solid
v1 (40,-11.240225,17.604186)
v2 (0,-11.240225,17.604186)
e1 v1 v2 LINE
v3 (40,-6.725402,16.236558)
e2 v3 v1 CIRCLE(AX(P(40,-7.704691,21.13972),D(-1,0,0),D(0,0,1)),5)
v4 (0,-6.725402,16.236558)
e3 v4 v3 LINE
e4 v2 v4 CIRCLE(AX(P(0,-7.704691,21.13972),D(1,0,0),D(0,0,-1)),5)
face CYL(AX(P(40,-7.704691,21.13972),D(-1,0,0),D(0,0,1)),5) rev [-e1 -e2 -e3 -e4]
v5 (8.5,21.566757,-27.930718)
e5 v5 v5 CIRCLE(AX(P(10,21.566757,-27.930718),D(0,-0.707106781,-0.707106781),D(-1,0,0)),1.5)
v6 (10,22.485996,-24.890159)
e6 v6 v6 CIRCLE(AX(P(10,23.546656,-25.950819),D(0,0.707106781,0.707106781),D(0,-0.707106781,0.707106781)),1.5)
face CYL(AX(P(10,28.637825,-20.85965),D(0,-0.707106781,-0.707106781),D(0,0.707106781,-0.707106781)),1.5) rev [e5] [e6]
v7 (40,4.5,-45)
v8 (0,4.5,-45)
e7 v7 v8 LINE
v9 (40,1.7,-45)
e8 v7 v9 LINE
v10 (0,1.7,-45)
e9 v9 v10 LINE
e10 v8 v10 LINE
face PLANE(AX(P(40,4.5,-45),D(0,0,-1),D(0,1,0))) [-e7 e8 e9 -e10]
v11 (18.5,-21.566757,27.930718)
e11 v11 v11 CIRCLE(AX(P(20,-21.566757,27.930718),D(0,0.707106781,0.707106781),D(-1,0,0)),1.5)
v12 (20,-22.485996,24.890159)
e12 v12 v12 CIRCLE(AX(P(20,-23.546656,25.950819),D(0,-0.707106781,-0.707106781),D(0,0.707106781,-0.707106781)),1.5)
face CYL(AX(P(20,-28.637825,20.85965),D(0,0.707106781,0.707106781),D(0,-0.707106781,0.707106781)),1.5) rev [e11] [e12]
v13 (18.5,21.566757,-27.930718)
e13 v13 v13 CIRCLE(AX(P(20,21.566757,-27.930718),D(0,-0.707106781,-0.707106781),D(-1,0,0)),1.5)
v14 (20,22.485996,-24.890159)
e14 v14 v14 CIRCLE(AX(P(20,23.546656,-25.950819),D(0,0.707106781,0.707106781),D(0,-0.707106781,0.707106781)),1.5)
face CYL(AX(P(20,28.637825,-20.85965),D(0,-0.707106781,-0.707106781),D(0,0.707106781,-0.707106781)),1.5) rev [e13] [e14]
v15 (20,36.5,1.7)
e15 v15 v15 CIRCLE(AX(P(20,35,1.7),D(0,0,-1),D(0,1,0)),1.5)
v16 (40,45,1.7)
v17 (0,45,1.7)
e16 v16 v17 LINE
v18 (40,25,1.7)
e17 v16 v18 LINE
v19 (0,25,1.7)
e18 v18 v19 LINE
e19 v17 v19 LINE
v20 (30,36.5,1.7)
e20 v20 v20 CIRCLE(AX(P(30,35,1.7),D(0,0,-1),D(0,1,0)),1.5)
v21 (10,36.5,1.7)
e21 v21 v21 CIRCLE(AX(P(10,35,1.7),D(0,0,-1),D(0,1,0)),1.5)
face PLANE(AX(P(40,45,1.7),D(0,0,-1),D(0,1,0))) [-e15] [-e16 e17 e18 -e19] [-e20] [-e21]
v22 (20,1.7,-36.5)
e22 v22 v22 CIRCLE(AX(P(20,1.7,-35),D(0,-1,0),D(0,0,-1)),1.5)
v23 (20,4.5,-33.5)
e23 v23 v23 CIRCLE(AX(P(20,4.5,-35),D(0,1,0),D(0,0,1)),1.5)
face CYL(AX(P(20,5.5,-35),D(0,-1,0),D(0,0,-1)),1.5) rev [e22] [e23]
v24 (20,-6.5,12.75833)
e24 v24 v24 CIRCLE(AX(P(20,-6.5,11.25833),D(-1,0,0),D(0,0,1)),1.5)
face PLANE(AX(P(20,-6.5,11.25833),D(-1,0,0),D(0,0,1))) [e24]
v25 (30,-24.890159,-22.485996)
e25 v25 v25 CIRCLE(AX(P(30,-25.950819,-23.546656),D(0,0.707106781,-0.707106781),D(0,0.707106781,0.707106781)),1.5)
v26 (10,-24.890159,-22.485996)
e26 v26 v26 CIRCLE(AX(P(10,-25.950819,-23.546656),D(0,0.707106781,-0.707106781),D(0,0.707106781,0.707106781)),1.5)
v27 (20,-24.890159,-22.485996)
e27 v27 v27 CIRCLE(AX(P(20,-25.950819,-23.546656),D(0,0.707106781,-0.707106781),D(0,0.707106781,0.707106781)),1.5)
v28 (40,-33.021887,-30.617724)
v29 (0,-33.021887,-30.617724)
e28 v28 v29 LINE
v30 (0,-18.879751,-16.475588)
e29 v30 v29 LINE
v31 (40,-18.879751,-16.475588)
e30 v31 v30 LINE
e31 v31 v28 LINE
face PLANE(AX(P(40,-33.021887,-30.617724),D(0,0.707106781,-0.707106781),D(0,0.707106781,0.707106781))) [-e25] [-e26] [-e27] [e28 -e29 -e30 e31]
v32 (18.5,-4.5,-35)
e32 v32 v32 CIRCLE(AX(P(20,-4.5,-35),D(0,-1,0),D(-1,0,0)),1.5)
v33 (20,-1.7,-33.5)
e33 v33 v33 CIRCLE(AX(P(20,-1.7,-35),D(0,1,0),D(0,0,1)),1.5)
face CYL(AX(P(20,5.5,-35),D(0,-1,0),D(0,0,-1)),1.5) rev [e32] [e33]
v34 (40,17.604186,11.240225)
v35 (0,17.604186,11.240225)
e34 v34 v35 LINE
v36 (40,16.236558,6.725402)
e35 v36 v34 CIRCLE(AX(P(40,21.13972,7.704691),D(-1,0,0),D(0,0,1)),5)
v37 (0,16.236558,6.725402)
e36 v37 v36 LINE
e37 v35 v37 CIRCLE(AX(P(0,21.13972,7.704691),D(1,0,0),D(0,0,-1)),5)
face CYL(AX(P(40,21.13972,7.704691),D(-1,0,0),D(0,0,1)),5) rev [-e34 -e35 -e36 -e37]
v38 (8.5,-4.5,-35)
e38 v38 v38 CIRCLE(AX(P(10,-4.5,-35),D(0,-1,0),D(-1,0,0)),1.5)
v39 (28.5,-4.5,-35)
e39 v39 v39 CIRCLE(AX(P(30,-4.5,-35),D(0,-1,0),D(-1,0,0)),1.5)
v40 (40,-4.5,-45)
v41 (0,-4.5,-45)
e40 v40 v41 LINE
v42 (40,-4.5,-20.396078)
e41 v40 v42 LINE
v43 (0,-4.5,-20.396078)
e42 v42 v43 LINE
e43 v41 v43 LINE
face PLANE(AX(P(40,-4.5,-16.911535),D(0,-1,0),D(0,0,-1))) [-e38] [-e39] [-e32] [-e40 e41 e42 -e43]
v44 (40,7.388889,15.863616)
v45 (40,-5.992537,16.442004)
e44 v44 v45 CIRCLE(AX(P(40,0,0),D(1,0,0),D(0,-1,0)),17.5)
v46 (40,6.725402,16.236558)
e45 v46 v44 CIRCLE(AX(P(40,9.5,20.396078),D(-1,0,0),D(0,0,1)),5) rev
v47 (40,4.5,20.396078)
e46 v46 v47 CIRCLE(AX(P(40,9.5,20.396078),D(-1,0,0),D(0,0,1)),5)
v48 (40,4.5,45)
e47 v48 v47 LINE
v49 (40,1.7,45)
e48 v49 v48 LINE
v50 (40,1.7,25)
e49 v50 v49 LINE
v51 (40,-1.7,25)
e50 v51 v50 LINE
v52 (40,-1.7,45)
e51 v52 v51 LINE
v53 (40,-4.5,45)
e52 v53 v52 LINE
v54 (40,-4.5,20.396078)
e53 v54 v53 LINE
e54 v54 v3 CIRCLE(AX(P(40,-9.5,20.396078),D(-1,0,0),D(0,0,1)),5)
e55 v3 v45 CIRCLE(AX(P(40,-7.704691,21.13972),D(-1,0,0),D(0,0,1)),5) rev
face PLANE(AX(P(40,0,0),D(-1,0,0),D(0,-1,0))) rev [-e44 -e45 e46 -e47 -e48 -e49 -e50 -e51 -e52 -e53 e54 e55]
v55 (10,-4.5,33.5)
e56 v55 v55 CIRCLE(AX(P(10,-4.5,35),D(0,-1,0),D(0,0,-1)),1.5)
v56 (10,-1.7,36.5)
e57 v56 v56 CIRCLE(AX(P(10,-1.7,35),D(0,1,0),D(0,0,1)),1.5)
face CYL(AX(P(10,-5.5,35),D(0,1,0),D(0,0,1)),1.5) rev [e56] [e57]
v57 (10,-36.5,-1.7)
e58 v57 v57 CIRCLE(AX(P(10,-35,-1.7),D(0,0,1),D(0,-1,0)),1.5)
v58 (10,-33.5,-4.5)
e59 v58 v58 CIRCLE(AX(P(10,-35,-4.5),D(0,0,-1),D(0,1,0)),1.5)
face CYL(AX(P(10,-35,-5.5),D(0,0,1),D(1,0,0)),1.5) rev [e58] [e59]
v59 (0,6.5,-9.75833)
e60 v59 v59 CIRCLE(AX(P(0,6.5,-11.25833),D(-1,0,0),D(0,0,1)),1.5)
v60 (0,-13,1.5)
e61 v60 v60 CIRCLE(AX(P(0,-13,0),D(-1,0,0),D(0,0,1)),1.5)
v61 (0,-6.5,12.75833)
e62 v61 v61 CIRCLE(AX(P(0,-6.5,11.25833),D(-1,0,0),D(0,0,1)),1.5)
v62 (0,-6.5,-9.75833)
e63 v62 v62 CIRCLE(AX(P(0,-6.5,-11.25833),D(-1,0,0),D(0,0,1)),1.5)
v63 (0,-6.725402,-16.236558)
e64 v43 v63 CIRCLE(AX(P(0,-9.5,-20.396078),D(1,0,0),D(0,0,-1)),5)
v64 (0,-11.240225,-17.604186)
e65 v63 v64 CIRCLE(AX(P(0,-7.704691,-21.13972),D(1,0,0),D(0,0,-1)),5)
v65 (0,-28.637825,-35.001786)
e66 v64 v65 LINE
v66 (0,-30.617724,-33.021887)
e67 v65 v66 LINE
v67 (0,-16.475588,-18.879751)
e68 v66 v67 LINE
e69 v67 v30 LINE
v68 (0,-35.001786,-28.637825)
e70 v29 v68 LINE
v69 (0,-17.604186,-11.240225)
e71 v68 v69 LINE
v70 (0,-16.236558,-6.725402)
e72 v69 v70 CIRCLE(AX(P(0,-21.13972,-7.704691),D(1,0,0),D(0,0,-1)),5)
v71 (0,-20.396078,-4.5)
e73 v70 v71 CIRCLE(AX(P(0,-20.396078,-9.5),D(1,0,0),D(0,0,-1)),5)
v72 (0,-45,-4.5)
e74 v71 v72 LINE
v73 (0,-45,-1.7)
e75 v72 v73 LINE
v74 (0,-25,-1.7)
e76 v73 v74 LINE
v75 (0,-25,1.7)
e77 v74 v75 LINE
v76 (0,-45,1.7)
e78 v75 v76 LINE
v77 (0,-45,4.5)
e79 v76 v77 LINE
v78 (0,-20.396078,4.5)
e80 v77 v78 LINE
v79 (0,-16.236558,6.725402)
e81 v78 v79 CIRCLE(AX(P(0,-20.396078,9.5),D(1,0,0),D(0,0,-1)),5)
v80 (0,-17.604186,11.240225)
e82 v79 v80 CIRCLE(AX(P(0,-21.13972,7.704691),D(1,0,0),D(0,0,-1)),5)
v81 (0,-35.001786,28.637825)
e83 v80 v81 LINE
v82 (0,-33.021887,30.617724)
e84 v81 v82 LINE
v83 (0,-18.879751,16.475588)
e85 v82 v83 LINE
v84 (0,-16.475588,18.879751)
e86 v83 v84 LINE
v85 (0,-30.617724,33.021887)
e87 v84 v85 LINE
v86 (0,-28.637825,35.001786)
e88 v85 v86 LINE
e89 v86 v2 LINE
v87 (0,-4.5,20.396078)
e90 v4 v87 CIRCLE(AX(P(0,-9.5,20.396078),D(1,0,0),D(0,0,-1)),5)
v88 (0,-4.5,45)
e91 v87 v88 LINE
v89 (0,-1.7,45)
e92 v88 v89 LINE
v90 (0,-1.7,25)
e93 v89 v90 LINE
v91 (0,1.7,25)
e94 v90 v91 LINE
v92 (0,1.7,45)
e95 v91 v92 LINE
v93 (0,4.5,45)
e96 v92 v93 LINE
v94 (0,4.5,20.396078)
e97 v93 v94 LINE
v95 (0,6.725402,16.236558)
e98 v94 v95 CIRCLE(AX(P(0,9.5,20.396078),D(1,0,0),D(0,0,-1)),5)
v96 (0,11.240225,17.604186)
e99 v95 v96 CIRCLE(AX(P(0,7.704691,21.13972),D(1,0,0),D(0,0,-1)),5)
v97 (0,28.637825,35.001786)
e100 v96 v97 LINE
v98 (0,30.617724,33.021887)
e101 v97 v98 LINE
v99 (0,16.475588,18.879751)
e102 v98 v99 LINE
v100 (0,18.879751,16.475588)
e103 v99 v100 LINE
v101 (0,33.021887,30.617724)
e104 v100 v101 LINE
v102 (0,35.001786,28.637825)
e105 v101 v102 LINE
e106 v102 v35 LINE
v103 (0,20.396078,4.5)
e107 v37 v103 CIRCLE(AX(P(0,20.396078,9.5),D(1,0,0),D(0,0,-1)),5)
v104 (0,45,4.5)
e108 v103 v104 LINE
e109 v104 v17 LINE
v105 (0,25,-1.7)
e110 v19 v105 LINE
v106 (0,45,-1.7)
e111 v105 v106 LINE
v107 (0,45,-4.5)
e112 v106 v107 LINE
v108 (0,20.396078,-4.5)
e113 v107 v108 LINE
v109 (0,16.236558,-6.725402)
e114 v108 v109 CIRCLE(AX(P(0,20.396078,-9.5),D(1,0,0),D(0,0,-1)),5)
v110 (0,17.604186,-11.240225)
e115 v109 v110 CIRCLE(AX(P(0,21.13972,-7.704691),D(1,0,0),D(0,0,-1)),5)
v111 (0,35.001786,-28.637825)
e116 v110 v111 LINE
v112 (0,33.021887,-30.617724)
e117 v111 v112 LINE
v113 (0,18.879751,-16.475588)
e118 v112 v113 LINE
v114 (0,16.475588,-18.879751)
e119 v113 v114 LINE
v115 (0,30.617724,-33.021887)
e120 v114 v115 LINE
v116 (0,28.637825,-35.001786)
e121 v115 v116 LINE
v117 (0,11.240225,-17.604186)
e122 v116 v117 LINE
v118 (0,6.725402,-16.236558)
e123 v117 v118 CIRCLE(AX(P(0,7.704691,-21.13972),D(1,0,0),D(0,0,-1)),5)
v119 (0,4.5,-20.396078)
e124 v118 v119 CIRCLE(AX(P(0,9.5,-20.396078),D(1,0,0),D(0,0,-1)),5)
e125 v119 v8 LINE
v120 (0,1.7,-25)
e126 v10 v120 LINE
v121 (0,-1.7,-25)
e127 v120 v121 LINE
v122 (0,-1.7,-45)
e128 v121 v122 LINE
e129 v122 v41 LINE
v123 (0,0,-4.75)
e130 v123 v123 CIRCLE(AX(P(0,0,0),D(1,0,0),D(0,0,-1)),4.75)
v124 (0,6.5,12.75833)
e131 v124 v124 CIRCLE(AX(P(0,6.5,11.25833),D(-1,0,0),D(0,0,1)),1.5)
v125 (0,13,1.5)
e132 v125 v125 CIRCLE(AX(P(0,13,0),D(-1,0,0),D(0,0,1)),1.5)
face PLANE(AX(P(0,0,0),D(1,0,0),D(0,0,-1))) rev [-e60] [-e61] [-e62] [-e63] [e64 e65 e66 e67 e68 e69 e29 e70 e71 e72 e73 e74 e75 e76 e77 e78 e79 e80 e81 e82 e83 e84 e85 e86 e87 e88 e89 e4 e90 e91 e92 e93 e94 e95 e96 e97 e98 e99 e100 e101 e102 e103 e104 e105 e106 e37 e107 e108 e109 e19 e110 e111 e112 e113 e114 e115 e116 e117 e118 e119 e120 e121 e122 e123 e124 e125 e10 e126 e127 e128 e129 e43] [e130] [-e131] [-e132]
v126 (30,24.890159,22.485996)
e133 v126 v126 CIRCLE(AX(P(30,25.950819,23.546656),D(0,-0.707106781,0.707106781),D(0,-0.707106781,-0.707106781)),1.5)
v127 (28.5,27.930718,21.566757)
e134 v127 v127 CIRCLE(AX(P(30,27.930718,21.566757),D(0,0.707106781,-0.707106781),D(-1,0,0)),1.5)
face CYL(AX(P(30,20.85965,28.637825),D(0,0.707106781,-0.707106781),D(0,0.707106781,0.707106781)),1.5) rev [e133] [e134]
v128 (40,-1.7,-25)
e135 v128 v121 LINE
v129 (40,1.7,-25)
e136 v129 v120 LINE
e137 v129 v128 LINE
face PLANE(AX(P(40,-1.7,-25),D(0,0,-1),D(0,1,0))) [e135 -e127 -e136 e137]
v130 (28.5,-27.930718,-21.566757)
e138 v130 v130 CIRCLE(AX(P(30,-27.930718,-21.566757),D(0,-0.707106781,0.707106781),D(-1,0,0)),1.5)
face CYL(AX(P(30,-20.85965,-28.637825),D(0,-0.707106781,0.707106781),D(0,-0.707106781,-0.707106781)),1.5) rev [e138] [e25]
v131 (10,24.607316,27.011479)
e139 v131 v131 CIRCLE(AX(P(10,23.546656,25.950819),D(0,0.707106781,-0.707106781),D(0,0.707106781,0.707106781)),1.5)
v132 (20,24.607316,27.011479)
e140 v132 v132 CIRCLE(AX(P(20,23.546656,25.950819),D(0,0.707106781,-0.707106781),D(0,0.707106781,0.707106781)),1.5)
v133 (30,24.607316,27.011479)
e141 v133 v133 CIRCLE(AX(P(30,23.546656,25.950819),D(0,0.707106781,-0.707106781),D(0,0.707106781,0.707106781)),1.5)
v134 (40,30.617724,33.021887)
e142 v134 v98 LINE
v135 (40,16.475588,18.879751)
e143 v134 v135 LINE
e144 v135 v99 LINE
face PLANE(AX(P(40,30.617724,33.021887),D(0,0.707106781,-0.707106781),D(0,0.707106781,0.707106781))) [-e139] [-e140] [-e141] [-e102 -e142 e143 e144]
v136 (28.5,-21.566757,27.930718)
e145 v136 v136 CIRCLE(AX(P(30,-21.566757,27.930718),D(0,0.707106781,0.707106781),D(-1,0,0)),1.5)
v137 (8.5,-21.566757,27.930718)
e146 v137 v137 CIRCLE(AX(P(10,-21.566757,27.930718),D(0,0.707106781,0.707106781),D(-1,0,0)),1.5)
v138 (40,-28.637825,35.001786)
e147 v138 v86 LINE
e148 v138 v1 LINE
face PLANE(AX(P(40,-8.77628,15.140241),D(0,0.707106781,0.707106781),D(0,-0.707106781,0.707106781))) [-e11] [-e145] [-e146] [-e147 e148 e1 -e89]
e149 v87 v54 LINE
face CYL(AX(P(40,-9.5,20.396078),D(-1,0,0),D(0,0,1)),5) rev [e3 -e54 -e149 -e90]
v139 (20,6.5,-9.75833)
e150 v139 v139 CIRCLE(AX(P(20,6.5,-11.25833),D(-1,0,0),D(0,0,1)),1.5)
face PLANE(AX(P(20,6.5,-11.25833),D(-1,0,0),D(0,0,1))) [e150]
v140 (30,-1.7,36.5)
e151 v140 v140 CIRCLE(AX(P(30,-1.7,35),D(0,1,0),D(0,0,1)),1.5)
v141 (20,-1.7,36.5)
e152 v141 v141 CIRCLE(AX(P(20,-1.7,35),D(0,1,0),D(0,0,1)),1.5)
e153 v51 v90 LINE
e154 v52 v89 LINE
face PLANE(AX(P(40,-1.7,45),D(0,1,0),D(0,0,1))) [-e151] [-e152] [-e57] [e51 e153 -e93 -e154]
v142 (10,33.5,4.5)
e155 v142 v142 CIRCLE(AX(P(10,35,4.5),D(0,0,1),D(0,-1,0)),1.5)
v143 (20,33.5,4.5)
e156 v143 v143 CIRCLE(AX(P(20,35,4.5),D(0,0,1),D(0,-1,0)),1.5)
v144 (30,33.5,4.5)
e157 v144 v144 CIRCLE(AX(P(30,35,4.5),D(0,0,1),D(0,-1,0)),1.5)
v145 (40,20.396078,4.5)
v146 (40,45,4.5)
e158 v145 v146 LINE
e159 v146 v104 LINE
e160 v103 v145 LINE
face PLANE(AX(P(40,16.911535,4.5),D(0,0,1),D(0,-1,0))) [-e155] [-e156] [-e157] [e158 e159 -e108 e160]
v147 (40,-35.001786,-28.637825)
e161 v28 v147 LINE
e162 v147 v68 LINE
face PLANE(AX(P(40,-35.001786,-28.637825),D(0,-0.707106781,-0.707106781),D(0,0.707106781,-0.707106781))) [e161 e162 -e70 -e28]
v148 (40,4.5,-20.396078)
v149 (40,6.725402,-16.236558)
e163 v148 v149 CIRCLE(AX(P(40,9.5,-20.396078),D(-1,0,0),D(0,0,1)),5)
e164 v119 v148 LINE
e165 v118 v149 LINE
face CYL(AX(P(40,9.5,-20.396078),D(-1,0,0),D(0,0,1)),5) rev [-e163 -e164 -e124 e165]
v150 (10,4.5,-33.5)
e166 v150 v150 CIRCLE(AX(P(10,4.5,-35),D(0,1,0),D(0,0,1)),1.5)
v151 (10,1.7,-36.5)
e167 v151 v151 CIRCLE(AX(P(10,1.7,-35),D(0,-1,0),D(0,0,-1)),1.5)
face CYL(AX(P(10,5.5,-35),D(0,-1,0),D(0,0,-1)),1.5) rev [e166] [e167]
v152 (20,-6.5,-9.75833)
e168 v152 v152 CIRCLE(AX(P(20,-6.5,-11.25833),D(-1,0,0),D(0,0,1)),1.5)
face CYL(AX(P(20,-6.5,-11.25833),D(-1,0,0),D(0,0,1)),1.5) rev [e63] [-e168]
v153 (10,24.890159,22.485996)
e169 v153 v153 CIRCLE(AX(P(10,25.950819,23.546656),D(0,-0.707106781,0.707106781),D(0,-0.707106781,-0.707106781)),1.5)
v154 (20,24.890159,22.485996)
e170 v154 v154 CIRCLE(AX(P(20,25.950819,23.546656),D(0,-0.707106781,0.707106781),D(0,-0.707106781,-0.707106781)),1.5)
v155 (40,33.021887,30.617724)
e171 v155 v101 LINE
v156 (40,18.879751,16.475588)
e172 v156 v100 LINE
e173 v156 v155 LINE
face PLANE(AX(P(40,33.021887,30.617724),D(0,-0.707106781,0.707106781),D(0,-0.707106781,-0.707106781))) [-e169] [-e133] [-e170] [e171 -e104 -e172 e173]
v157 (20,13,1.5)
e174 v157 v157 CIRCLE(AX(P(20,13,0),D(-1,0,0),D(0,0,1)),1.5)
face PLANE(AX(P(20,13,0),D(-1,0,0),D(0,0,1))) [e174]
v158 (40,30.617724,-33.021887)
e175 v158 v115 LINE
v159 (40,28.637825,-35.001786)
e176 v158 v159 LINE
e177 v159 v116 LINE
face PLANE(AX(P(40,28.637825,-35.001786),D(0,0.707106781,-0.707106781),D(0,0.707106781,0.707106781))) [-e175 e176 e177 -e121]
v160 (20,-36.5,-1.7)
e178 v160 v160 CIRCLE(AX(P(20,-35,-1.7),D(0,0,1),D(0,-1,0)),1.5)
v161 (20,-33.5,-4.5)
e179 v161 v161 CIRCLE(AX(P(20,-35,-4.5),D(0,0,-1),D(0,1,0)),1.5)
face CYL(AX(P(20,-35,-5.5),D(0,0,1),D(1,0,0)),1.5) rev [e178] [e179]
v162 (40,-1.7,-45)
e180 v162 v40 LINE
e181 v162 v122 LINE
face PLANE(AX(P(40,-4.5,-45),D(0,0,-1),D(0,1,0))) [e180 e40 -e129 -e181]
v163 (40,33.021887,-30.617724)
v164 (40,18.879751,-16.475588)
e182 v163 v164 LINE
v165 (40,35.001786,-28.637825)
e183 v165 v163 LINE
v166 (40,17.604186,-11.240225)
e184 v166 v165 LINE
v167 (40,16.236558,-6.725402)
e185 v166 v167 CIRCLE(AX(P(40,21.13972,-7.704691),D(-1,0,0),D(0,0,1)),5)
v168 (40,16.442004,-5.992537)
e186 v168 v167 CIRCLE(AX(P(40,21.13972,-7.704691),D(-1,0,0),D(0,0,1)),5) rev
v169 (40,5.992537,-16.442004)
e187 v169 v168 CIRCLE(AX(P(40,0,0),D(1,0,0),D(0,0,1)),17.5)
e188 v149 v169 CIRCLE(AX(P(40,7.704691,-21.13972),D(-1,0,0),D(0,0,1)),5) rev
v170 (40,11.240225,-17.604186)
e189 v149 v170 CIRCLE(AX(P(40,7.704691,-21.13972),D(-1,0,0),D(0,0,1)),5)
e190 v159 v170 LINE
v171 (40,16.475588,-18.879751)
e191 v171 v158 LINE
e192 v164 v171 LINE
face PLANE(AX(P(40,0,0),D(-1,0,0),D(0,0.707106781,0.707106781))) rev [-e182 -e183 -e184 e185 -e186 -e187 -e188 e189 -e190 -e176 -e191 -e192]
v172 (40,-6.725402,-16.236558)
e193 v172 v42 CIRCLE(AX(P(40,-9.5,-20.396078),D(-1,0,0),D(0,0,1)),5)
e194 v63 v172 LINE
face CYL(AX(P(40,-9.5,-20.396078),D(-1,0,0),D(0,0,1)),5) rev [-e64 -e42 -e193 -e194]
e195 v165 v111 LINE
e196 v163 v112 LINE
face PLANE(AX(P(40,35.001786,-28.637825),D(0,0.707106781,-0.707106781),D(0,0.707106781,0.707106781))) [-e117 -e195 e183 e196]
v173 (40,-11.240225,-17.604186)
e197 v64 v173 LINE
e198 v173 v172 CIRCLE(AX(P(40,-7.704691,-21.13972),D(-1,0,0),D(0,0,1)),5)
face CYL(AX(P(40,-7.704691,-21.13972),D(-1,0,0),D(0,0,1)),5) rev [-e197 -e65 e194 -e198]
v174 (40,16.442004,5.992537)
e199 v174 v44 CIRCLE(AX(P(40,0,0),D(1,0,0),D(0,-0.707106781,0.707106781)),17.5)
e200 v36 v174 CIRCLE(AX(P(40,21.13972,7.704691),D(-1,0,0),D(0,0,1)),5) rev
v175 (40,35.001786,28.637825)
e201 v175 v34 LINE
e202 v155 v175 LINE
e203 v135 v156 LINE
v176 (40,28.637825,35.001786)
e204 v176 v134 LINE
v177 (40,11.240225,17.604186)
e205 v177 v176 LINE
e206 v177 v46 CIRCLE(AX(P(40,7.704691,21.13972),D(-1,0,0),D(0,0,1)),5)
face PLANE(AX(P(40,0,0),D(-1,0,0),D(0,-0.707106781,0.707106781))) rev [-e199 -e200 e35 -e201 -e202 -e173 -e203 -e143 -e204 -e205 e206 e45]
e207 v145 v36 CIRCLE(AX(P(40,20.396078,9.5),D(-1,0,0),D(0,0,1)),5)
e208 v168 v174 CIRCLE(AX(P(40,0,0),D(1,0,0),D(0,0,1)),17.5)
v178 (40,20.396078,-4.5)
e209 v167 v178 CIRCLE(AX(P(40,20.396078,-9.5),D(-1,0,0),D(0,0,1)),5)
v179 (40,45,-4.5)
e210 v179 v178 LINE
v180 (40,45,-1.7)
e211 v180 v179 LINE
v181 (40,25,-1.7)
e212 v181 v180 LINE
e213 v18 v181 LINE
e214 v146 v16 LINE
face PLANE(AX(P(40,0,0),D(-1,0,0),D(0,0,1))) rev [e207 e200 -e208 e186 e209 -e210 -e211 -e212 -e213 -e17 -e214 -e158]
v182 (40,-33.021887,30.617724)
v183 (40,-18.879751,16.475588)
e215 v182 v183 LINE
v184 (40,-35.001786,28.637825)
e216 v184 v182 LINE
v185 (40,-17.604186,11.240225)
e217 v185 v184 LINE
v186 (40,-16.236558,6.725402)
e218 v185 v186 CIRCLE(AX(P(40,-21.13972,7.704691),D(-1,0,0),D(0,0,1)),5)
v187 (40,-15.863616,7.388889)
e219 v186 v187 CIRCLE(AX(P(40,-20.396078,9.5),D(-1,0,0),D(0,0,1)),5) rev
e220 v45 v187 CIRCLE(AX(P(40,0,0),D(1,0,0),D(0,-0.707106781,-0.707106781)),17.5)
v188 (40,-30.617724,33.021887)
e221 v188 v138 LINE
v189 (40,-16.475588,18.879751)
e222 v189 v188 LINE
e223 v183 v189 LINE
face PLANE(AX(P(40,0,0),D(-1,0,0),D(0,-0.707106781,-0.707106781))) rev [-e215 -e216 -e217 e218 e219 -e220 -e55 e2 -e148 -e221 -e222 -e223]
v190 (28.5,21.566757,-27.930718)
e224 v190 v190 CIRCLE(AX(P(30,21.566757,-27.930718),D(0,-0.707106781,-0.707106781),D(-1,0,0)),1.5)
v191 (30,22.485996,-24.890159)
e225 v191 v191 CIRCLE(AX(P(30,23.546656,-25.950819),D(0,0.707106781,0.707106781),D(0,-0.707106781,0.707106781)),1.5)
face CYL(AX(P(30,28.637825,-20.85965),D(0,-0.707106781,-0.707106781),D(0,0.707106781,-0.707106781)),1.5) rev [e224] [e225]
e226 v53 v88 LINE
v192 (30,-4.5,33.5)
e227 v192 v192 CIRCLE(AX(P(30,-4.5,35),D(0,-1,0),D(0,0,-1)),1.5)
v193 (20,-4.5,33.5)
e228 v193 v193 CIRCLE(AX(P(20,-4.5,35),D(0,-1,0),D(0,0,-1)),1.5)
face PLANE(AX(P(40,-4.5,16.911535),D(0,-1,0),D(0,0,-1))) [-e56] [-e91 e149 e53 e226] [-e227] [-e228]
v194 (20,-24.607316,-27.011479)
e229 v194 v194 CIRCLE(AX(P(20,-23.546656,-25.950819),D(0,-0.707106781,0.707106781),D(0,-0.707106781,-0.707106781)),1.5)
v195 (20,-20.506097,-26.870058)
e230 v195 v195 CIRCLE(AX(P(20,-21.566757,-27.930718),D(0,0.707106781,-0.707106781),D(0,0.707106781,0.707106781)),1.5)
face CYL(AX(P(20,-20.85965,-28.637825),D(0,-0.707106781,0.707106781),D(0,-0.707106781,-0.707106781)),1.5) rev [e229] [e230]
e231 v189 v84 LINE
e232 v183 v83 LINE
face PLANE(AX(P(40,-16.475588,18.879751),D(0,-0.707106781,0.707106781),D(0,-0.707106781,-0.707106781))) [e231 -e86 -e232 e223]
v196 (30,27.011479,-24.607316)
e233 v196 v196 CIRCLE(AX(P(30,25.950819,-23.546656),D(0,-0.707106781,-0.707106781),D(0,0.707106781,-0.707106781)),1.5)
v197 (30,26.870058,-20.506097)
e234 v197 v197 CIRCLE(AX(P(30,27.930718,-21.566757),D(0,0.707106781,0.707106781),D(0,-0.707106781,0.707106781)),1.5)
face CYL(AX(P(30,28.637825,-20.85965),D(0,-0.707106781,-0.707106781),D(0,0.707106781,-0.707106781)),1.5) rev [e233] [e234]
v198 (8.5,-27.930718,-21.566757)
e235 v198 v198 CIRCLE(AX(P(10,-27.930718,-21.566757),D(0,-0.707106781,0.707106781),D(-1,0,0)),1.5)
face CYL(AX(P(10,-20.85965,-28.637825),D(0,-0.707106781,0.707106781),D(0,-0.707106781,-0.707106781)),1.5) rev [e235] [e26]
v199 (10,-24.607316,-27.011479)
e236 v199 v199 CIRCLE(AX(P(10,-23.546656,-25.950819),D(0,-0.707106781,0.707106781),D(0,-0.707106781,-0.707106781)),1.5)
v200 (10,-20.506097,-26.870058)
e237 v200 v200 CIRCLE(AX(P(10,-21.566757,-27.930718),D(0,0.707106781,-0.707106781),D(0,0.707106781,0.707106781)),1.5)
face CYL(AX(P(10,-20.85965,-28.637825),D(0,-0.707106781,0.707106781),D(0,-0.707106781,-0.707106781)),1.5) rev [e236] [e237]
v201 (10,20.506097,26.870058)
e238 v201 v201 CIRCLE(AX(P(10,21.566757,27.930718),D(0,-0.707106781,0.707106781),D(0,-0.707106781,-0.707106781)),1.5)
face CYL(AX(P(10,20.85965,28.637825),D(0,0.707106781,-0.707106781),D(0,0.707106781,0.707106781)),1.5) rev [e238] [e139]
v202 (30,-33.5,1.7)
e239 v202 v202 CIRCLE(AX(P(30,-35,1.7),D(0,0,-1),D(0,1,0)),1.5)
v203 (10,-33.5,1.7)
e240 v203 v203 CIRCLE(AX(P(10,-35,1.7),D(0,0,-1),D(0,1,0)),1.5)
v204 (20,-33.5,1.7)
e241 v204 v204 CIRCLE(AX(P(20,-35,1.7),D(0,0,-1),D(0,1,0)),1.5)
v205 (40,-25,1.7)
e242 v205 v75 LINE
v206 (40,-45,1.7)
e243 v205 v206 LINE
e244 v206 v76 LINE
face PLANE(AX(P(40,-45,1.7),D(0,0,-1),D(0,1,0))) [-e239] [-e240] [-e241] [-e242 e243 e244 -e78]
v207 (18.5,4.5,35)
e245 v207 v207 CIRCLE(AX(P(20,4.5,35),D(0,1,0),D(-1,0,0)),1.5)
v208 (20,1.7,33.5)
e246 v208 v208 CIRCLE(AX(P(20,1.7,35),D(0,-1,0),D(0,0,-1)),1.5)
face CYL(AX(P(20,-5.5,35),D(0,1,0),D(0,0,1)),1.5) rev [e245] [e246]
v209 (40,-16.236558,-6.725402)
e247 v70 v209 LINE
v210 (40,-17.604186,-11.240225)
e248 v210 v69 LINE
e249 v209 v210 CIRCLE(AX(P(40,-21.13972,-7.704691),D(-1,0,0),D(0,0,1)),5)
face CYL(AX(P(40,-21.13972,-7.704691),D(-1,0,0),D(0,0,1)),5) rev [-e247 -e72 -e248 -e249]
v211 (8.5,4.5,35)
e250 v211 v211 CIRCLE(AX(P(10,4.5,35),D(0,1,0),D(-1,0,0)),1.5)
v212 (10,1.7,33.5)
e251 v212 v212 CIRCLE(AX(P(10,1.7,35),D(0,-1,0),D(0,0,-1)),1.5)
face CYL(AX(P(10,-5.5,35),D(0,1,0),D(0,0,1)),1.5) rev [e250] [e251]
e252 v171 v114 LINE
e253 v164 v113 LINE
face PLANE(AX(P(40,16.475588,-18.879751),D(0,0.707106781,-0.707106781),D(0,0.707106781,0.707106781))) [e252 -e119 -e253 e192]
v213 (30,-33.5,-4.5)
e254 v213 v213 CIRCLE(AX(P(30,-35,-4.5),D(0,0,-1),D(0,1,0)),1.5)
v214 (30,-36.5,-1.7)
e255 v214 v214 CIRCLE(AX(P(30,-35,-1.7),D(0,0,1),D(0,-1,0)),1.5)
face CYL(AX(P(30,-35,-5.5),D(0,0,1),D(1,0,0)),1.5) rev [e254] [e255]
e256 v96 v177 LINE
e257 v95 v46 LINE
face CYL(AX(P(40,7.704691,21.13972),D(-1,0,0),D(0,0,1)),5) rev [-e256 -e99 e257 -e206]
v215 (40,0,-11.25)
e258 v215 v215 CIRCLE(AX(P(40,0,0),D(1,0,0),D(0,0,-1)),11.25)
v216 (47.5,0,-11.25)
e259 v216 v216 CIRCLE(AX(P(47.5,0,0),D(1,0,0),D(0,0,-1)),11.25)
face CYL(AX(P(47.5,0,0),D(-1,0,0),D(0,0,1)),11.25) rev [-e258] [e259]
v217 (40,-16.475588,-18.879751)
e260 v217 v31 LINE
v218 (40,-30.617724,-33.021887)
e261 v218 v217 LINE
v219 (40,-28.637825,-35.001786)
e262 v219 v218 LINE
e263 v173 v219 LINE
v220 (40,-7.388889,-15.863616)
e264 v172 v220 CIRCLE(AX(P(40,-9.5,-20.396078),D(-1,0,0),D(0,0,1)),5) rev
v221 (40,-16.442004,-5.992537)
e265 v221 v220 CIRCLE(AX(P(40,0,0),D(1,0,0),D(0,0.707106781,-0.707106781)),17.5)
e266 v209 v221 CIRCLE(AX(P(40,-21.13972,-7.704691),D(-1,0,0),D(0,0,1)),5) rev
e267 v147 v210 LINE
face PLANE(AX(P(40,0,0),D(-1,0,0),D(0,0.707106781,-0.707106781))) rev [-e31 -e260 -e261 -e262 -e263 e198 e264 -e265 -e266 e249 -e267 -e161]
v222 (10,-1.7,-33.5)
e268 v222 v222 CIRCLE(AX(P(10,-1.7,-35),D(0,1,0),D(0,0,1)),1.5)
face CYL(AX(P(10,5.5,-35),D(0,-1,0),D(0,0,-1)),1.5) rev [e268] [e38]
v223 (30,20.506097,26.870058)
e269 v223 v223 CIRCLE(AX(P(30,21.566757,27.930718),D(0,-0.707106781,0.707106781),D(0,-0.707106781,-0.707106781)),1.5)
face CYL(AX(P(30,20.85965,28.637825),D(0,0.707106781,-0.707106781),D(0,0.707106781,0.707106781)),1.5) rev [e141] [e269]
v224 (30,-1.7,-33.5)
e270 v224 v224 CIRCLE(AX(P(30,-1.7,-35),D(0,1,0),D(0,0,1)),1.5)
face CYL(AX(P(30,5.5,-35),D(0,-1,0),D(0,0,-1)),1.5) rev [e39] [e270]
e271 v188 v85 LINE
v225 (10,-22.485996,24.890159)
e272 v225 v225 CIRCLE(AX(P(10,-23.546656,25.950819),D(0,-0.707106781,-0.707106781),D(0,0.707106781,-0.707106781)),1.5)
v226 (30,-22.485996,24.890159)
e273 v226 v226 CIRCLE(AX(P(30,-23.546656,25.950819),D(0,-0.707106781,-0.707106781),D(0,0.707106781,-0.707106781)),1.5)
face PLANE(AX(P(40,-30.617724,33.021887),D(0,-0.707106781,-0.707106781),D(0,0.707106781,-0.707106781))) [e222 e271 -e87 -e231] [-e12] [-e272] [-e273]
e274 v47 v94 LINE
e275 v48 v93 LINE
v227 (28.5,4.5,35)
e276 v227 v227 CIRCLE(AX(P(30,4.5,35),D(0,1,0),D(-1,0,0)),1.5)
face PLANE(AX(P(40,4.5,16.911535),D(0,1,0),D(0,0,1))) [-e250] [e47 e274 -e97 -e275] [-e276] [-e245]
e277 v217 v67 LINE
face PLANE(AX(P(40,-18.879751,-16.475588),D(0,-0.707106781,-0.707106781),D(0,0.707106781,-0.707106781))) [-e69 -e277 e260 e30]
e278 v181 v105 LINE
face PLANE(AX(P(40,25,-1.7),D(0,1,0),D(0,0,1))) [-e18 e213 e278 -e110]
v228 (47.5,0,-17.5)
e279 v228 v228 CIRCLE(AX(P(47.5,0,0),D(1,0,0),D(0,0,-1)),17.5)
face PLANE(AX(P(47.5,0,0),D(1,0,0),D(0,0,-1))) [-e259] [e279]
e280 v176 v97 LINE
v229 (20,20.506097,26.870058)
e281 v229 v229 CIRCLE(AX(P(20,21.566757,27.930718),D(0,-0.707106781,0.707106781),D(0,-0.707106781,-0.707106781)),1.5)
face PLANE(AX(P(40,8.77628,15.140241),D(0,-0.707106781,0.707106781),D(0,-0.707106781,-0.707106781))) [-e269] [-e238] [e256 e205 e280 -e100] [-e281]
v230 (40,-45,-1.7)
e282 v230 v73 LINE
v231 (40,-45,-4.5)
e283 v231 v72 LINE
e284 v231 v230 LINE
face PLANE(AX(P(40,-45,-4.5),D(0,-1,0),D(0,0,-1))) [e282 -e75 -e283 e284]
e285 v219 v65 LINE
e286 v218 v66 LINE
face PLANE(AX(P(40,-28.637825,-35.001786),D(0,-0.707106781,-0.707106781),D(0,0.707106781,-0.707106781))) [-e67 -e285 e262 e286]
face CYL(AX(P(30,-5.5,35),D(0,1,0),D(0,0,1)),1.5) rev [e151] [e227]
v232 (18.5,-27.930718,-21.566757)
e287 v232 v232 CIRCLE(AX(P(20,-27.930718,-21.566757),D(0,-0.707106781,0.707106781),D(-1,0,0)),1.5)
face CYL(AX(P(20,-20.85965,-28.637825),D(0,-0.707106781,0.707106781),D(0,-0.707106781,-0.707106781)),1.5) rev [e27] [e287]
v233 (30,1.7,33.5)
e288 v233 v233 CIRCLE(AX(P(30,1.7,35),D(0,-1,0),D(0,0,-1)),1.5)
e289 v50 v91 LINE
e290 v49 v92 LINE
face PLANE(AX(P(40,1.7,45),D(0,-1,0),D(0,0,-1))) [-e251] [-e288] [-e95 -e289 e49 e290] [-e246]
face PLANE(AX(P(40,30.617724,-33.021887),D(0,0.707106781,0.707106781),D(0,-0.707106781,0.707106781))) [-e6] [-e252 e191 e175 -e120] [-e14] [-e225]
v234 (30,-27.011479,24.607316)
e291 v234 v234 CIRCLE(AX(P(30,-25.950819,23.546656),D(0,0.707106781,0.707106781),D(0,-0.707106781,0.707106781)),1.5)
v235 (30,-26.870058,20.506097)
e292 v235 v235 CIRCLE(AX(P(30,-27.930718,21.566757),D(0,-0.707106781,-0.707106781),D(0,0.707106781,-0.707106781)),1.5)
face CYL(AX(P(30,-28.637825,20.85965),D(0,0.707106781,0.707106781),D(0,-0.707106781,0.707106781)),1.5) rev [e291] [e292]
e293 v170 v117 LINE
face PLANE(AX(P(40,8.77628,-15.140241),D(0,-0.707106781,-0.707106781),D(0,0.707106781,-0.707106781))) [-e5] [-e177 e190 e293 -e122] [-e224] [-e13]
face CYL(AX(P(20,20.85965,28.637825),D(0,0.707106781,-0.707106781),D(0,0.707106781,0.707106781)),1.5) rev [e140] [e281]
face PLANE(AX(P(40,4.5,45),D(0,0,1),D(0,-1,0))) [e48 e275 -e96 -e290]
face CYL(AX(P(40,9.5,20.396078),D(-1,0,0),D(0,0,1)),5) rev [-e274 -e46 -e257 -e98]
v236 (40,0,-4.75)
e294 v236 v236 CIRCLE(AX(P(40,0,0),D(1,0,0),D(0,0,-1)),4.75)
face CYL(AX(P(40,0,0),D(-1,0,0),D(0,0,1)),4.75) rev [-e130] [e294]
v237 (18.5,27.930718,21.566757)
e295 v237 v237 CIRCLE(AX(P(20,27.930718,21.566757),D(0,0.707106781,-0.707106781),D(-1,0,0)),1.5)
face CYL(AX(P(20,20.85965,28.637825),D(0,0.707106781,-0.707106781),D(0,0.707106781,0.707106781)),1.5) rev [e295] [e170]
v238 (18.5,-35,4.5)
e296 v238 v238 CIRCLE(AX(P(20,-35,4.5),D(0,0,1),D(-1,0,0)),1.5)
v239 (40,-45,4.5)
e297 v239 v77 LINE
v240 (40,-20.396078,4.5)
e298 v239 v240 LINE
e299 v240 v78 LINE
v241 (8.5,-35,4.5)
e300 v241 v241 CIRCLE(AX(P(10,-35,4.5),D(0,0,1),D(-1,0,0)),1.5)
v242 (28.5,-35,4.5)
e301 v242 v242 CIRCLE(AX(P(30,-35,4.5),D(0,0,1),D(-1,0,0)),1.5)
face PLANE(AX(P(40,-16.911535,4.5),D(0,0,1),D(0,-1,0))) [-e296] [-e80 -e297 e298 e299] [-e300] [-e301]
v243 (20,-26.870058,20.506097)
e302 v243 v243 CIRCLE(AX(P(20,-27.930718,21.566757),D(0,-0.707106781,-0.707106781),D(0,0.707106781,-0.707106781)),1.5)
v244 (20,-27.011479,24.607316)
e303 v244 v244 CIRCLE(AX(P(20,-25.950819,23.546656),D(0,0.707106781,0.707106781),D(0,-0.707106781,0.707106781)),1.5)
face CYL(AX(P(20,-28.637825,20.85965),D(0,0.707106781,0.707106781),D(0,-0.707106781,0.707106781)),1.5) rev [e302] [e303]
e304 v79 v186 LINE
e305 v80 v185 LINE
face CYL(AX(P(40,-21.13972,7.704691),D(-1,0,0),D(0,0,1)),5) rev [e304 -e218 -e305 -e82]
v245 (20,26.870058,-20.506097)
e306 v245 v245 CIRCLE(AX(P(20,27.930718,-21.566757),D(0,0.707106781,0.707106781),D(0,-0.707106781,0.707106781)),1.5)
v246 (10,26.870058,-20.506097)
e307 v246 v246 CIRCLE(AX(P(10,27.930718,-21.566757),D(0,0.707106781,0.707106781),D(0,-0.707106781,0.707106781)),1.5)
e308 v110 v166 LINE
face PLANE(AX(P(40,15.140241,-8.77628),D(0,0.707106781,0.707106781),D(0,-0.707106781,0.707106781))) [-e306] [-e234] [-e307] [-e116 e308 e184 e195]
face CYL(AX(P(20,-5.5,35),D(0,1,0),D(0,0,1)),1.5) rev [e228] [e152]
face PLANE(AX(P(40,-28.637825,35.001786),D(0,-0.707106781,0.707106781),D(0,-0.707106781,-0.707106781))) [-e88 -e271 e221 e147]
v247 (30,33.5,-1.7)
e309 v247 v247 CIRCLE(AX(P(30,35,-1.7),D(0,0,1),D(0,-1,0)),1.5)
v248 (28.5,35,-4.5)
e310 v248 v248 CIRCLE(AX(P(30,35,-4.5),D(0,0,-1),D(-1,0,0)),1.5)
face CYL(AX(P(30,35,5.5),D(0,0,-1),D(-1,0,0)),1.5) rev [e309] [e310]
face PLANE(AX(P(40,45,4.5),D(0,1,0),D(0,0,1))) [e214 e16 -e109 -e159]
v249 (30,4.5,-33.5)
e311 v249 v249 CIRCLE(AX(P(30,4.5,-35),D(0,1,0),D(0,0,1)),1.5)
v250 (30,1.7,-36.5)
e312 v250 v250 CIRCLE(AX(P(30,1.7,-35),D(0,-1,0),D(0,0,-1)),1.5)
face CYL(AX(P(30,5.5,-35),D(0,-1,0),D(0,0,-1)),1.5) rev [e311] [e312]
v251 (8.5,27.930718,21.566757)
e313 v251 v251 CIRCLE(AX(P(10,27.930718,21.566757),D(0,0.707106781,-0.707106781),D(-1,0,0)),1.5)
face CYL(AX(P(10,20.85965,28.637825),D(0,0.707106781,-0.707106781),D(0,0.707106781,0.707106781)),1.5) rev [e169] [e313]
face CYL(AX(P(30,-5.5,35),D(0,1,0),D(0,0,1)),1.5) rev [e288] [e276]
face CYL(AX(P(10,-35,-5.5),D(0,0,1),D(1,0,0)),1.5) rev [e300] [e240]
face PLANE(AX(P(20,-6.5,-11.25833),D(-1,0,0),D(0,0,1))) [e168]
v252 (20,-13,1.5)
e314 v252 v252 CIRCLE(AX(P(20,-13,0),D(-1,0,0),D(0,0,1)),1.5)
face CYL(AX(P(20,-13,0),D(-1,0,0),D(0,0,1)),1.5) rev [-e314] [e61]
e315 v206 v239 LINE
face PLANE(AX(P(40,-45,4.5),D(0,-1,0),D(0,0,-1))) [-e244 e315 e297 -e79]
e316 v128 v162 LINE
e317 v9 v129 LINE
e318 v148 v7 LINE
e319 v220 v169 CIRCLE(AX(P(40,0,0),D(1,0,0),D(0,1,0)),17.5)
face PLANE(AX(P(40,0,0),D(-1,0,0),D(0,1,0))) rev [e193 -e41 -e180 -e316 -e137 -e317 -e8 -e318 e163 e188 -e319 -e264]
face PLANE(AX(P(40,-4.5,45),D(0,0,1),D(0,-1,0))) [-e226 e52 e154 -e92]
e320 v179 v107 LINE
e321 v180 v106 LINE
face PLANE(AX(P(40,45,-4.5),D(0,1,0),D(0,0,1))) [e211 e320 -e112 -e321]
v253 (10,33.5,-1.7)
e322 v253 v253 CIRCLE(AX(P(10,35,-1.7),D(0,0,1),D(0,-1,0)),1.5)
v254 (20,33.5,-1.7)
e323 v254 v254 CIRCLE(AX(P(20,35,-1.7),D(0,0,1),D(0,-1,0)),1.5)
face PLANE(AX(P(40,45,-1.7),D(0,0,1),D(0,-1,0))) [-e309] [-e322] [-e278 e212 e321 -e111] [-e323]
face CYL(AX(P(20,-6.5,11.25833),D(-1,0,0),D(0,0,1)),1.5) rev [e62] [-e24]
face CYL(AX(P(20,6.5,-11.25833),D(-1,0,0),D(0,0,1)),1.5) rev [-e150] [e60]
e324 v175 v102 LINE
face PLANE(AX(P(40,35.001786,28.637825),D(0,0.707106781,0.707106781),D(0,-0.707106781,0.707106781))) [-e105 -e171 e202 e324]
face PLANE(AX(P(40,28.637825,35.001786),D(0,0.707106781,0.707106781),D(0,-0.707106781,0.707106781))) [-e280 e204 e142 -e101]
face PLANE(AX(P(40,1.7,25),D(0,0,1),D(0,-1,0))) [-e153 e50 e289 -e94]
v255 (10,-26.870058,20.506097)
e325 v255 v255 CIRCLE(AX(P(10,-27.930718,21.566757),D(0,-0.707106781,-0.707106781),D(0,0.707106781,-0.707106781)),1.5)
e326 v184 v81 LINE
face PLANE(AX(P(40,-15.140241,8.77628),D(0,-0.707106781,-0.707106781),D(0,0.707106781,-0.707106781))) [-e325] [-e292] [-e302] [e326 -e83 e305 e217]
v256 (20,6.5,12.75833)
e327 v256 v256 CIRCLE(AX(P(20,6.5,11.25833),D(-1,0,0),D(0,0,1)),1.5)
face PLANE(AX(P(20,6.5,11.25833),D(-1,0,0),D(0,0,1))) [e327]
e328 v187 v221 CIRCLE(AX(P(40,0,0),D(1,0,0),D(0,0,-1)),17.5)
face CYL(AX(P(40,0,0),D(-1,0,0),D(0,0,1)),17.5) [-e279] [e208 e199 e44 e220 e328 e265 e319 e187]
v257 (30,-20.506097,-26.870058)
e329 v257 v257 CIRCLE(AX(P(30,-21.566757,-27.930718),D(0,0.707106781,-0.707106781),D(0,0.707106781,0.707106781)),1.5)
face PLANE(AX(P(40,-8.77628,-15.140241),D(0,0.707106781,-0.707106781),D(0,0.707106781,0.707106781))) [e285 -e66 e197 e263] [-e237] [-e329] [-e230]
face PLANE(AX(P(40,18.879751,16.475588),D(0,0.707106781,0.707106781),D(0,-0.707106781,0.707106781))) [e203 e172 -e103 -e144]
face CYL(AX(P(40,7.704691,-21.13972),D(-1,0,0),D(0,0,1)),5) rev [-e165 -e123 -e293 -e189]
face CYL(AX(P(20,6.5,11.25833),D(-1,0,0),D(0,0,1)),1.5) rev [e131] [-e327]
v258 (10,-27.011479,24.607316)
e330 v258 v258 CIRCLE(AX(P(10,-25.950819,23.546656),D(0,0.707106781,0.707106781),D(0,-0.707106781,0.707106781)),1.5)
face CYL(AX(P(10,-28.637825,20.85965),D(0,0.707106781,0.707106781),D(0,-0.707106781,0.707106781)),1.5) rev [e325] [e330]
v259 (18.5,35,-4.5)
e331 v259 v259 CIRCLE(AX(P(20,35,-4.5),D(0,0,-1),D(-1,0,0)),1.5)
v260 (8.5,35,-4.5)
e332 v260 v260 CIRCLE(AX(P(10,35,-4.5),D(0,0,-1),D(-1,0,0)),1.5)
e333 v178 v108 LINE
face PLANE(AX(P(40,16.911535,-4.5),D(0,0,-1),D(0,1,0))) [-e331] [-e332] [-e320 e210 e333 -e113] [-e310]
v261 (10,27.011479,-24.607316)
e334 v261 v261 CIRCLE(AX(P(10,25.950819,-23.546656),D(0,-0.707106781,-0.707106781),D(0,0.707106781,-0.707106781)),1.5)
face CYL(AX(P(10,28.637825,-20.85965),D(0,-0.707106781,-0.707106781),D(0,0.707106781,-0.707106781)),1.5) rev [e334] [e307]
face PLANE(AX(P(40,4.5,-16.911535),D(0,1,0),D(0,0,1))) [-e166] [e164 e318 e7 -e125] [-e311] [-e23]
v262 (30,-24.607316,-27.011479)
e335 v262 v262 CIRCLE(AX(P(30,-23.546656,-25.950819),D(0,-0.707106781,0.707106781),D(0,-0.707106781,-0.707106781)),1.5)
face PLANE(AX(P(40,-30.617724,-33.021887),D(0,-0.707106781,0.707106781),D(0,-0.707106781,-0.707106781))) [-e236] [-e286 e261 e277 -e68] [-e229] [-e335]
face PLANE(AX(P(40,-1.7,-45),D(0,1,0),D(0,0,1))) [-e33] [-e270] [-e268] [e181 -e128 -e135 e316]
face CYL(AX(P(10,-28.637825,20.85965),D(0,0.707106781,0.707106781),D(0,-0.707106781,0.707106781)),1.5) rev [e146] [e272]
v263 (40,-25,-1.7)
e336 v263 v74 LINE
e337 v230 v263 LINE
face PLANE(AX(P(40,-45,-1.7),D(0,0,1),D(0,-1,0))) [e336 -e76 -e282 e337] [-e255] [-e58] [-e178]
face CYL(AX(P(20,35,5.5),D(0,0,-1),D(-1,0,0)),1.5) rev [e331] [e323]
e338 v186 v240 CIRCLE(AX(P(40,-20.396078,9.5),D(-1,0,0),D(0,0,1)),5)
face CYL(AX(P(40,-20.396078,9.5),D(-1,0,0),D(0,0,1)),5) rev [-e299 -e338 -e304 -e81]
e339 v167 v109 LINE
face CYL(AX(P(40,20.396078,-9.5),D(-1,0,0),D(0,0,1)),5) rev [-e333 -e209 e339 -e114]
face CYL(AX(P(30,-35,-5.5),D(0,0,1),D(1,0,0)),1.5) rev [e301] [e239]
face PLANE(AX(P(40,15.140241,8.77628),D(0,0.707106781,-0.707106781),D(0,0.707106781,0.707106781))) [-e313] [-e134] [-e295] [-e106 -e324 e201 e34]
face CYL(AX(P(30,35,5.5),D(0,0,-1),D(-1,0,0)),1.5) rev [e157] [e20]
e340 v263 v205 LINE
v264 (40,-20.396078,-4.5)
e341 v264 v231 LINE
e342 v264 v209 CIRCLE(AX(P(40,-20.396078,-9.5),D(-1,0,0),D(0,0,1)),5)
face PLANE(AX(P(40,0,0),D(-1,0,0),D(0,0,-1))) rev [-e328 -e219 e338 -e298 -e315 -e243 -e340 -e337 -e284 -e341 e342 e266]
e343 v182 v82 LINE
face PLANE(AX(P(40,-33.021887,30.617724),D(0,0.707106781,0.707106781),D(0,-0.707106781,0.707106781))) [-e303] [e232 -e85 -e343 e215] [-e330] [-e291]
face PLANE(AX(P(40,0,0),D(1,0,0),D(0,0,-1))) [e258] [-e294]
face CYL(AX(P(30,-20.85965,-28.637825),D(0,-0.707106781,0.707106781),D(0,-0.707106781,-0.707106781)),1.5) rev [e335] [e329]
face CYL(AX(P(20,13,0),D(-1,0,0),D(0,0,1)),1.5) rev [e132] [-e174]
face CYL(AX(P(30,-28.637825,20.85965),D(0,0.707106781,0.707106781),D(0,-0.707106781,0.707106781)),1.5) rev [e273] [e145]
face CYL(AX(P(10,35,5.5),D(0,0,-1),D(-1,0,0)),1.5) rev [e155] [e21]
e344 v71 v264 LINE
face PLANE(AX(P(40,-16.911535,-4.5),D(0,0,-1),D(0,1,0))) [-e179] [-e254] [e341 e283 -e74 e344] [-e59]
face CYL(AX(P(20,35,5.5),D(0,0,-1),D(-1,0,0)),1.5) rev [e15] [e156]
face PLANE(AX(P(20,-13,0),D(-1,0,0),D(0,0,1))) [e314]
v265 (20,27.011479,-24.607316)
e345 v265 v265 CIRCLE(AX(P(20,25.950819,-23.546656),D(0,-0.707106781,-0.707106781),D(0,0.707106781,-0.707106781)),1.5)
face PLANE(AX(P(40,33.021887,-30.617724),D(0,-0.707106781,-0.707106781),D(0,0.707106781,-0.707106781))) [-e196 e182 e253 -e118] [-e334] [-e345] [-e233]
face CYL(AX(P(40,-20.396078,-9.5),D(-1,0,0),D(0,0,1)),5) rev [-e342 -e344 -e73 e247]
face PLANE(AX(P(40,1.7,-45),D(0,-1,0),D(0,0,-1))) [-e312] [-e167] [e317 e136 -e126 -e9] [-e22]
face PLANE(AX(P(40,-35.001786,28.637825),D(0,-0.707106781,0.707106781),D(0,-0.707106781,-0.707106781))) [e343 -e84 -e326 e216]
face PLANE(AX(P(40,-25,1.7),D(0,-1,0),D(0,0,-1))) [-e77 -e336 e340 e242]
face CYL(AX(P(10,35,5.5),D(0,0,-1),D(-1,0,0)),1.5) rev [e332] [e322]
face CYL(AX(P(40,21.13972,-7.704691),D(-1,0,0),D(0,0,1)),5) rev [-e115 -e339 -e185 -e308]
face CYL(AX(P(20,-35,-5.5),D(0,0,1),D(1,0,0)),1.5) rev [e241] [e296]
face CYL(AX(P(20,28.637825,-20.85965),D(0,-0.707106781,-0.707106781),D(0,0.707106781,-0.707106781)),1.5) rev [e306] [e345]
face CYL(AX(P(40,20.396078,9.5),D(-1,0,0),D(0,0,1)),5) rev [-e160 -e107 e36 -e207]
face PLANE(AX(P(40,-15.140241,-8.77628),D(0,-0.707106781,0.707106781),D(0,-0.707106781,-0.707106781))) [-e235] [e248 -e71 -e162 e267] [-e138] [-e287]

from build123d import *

# Parameters (mm, degrees)
SKETCH1_R               = 17.5
SKETCH1_R_2             = 4.75
MAINBODY_DEPTH          = 40
SKETCH2_R               = 17.5
SKETCH2_R_2             = 11.25
BEARINGHOUSING_DEPTH    = 7.5
SKETCH3_R               = 1.5
MOUNTINGHOLES_DEPTH     = 20
BOSS_EXTRUDE3_DEPTH     = 40
SKETCH6_R               = 1.5
CUT_EXTRUDE2_DEPTH      = 10
FILLET1_R               = 5
CIRPATTERN1_DEPTH       = 40
CIRPATTERN1_START       = -5
CIRPATTERN1_2_OUTLINE_R = 1.5
CIRPATTERN1_2_DEPTH     = 10
CIRPATTERN1_3_OUTLINE_R = 1.5
CIRPATTERN1_3_DEPTH     = 10
CIRPATTERN1_4_OUTLINE_R = 1.5
CIRPATTERN1_4_DEPTH     = 10
CIRPATTERN1_5_OUTLINE_R = 1.5
CIRPATTERN1_5_DEPTH     = 10


with BuildPart() as part:
    # Sketch1 → MainBody (new body)
    with BuildSketch(Plane(origin=(0, 0, 0), x_dir=(0, 0, -1), z_dir=(1, 0, 0))):
        Circle(SKETCH1_R)
        Circle(SKETCH1_R_2, mode=Mode.SUBTRACT)
    extrude(amount=MAINBODY_DEPTH)

    # Sketch2 → BearingHousing (add)
    with BuildSketch(Plane(origin=(40, 0, 0), x_dir=(0, 0, -1), z_dir=(1, 0, 0))):
        Circle(SKETCH2_R)
        Circle(SKETCH2_R_2, mode=Mode.SUBTRACT)
    extrude(amount=BEARINGHOUSING_DEPTH)

    # Sketch3 → MountingHoles (cut)
    with BuildSketch(Plane.ZY):
        with Locations((0, 13)):
            Circle(SKETCH3_R)
        with Locations((11.258330249, 6.5)):
            Circle(SKETCH3_R)
        with Locations((11.258330249, -6.5)):
            Circle(SKETCH3_R)
        with Locations((0, -13)):
            Circle(SKETCH3_R)
        with Locations((-11.258330249, -6.5)):
            Circle(SKETCH3_R)
        with Locations((-11.258330249, 6.5)):
            Circle(SKETCH3_R)
    extrude(amount=-MOUNTINGHOLES_DEPTH, mode=Mode.SUBTRACT)

    # Sketch4 → Boss-Extrude3 (add)
    with BuildSketch(Plane.ZY):
        with BuildLine():
            Line((-4.5, 16.911534525), (-4.5, 45))
            Line((-4.5, 45), (-1.7, 45))
            Line((-1.7, 45), (-1.7, 25))
            Line((-1.7, 25), (1.7, 25))
            Line((1.7, 25), (1.7, 45))
            Line((1.7, 45), (4.5, 45))
            Line((4.5, 45), (4.5, 16.911534525))
            ThreePointArc((4.5, 16.911534525), (0, 17.5), (-4.5, 16.911534525))
        make_face()
    extrude(amount=-BOSS_EXTRUDE3_DEPTH)

    # Sketch6 → Cut-Extrude2 (cut)
    with BuildSketch(Plane(origin=(0, 0, -4.5), x_dir=(-1, 0, 0), z_dir=(0, 0, -1))):
        with Locations((-30, 35)):
            Circle(SKETCH6_R)
        with Locations((-20, 35)):
            Circle(SKETCH6_R)
        with Locations((-10, 35)):
            Circle(SKETCH6_R)
    extrude(amount=-CUT_EXTRUDE2_DEPTH, mode=Mode.SUBTRACT)

    # Fillet1
    fillet1_edges = [part.edges().sort_by_distance(p)[0] for p in [
        (20, 16.911534525, 4.5),
        (20, 16.911534525, -4.5),
    ]]
    fillet(fillet1_edges, radius=FILLET1_R)

    # CirPattern1: read off the stored shape, not the designer's step
    # CirPattern1 outline → CirPattern1 (add)
    with BuildSketch(Plane.YZ):
        with BuildLine():
            Line((-45, 4.5), (-45, 1.7))
            Line((-45, 1.7), (-25, 1.7))
            Line((-25, 1.7), (-25, -1.7))
            Line((-25, -1.7), (-45, -1.7))
            Line((-45, -1.7), (-45, -4.5))
            Line((-45, -4.5), (-20.396078054, -4.5))
            ThreePointArc((-20.396078054, -4.5), (-18.037369477, -5.091316086), (-16.236557831, -6.72540246))
            ThreePointArc((-16.236557831, -6.72540246), (-16.354450402, -9.154242143), (-17.604185617, -11.240224587))
            Line((-17.604185617, -11.240224587), (-35.001785669, -28.637824638))
            Line((-35.001785669, -28.637824638), (-33.021886681, -30.617723625))
            Line((-33.021886681, -30.617723625), (-18.879751058, -16.475588002))
            Line((-18.879751058, -16.475588002), (-16.475588002, -18.879751058))
            Line((-16.475588002, -18.879751058), (-30.617723625, -33.021886681))
            Line((-30.617723625, -33.021886681), (-28.637824638, -35.001785669))
            Line((-28.637824638, -35.001785669), (-11.240224587, -17.604185617))
            ThreePointArc((-11.240224587, -17.604185617), (-9.154242143, -16.354450402), (-6.72540246, -16.236557831))
            ThreePointArc((-6.72540246, -16.236557831), (-5.091316086, -18.037369477), (-4.5, -20.396078054))
            Line((-4.5, -20.396078054), (-4.5, -45))
            Line((-4.5, -45), (-1.7, -45))
            Line((-1.7, -45), (-1.7, -25))
            Line((-1.7, -25), (1.7, -25))
            Line((1.7, -25), (1.7, -45))
            Line((1.7, -45), (4.5, -45))
            Line((4.5, -45), (4.5, -20.396078054))
            ThreePointArc((4.5, -20.396078054), (5.091316086, -18.037369477), (6.72540246, -16.236557831))
            ThreePointArc((6.72540246, -16.236557831), (9.154242143, -16.354450402), (11.240224587, -17.604185617))
            Line((11.240224587, -17.604185617), (28.637824638, -35.001785669))
            Line((28.637824638, -35.001785669), (30.617723625, -33.021886681))
            Line((30.617723625, -33.021886681), (16.475588002, -18.879751058))
            Line((16.475588002, -18.879751058), (18.879751058, -16.475588002))
            Line((18.879751058, -16.475588002), (33.021886681, -30.617723625))
            Line((33.021886681, -30.617723625), (35.001785669, -28.637824638))
            Line((35.001785669, -28.637824638), (17.604185617, -11.240224587))
            ThreePointArc((17.604185617, -11.240224587), (16.354450402, -9.154242143), (16.236557831, -6.72540246))
            ThreePointArc((16.236557831, -6.72540246), (16.037443935, -7.05003906), (15.863616265, -7.388888889))
            ThreePointArc((15.863616265, -7.388888889), (-17.5, 0), (15.863616265, 7.388888889))
            ThreePointArc((15.863616265, 7.388888889), (16.037443935, 7.05003906), (16.236557831, 6.72540246))
            ThreePointArc((16.236557831, 6.72540246), (16.354450402, 9.154242143), (17.604185617, 11.240224587))
            Line((17.604185617, 11.240224587), (35.001785669, 28.637824638))
            Line((35.001785669, 28.637824638), (33.021886681, 30.617723625))
            Line((33.021886681, 30.617723625), (18.879751058, 16.475588002))
            Line((18.879751058, 16.475588002), (16.475588002, 18.879751058))
            Line((16.475588002, 18.879751058), (30.617723625, 33.021886681))
            Line((30.617723625, 33.021886681), (28.637824638, 35.001785669))
            Line((28.637824638, 35.001785669), (11.240224587, 17.604185617))
            ThreePointArc((11.240224587, 17.604185617), (9.154242143, 16.354450402), (6.72540246, 16.236557831))
            ThreePointArc((6.72540246, 16.236557831), (5.091316086, 18.037369477), (4.5, 20.396078054))
            Line((4.5, 20.396078054), (4.5, 45))
            Line((4.5, 45), (1.7, 45))
            Line((1.7, 45), (1.7, 25))
            Line((1.7, 25), (-1.7, 25))
            Line((-1.7, 25), (-1.7, 45))
            Line((-1.7, 45), (-4.5, 45))
            Line((-4.5, 45), (-4.5, 20.396078054))
            ThreePointArc((-4.5, 20.396078054), (-5.091316086, 18.037369477), (-6.72540246, 16.236557831))
            ThreePointArc((-6.72540246, 16.236557831), (-9.154242143, 16.354450402), (-11.240224587, 17.604185617))
            Line((-11.240224587, 17.604185617), (-28.637824638, 35.001785669))
            Line((-28.637824638, 35.001785669), (-30.617723625, 33.021886681))
            Line((-30.617723625, 33.021886681), (-16.475588002, 18.879751058))
            Line((-16.475588002, 18.879751058), (-18.879751058, 16.475588002))
            Line((-18.879751058, 16.475588002), (-33.021886681, 30.617723625))
            Line((-33.021886681, 30.617723625), (-35.001785669, 28.637824638))
            Line((-35.001785669, 28.637824638), (-17.604185617, 11.240224587))
            ThreePointArc((-17.604185617, 11.240224587), (-16.354450402, 9.154242143), (-16.236557831, 6.72540246))
            ThreePointArc((-16.236557831, 6.72540246), (-18.037369477, 5.091316086), (-20.396078054, 4.5))
            Line((-20.396078054, 4.5), (-45, 4.5))
        make_face()
    extrude(amount=CIRPATTERN1_DEPTH)

    # CirPattern1 2 outline → CirPattern1 2 (cut)
    with BuildSketch(Plane(origin=(0, 0, 0), x_dir=(1, 0, 0), z_dir=(0, 0.707106781186539, 0.707106781186556)).offset(CIRPATTERN1_START)):
        with Locations((30, 35)):
            Circle(CIRPATTERN1_2_OUTLINE_R)
        with Locations((20, 35)):
            Circle(CIRPATTERN1_2_OUTLINE_R)
        with Locations((10, 35)):
            Circle(CIRPATTERN1_2_OUTLINE_R)
        with Locations((10, -35)):
            Circle(CIRPATTERN1_2_OUTLINE_R)
        with Locations((20, -35)):
            Circle(CIRPATTERN1_2_OUTLINE_R)
        with Locations((30, -35)):
            Circle(CIRPATTERN1_2_OUTLINE_R)
    extrude(amount=CIRPATTERN1_2_DEPTH, mode=Mode.SUBTRACT)

    # CirPattern1 3 outline → CirPattern1 3 (cut)
    with BuildSketch(Plane(origin=(0, 0, 0), x_dir=(1, 0, 0), z_dir=(0, 1, 0)).offset(CIRPATTERN1_START)):
        with Locations((10, 35)):
            Circle(CIRPATTERN1_3_OUTLINE_R)
        with Locations((30, 35)):
            Circle(CIRPATTERN1_3_OUTLINE_R)
        with Locations((20, 35)):
            Circle(CIRPATTERN1_3_OUTLINE_R)
        with Locations((30, -35)):
            Circle(CIRPATTERN1_3_OUTLINE_R)
        with Locations((20, -35)):
            Circle(CIRPATTERN1_3_OUTLINE_R)
        with Locations((10, -35)):
            Circle(CIRPATTERN1_3_OUTLINE_R)
    extrude(amount=CIRPATTERN1_3_DEPTH, mode=Mode.SUBTRACT)

    # CirPattern1 4 outline → CirPattern1 4 (cut)
    with BuildSketch(Plane(origin=(0, 0, 0), x_dir=(1, 0, 0), z_dir=(0, 0.707106781186554, -0.707106781186541)).offset(CIRPATTERN1_START)):
        with Locations((30, 35)):
            Circle(CIRPATTERN1_4_OUTLINE_R)
        with Locations((20, 35)):
            Circle(CIRPATTERN1_4_OUTLINE_R)
        with Locations((10, 35)):
            Circle(CIRPATTERN1_4_OUTLINE_R)
        with Locations((30, -35)):
            Circle(CIRPATTERN1_4_OUTLINE_R)
        with Locations((20, -35)):
            Circle(CIRPATTERN1_4_OUTLINE_R)
        with Locations((10, -35)):
            Circle(CIRPATTERN1_4_OUTLINE_R)
    extrude(amount=CIRPATTERN1_4_DEPTH, mode=Mode.SUBTRACT)

    # CirPattern1 5 outline → CirPattern1 5 (cut)
    with BuildSketch(Plane.XY.offset(CIRPATTERN1_START)):
        with Locations((10, -35)):
            Circle(CIRPATTERN1_5_OUTLINE_R)
        with Locations((20, -35)):
            Circle(CIRPATTERN1_5_OUTLINE_R)
        with Locations((30, -35)):
            Circle(CIRPATTERN1_5_OUTLINE_R)
    extrude(amount=CIRPATTERN1_5_DEPTH, mode=Mode.SUBTRACT)


solid = part.part
